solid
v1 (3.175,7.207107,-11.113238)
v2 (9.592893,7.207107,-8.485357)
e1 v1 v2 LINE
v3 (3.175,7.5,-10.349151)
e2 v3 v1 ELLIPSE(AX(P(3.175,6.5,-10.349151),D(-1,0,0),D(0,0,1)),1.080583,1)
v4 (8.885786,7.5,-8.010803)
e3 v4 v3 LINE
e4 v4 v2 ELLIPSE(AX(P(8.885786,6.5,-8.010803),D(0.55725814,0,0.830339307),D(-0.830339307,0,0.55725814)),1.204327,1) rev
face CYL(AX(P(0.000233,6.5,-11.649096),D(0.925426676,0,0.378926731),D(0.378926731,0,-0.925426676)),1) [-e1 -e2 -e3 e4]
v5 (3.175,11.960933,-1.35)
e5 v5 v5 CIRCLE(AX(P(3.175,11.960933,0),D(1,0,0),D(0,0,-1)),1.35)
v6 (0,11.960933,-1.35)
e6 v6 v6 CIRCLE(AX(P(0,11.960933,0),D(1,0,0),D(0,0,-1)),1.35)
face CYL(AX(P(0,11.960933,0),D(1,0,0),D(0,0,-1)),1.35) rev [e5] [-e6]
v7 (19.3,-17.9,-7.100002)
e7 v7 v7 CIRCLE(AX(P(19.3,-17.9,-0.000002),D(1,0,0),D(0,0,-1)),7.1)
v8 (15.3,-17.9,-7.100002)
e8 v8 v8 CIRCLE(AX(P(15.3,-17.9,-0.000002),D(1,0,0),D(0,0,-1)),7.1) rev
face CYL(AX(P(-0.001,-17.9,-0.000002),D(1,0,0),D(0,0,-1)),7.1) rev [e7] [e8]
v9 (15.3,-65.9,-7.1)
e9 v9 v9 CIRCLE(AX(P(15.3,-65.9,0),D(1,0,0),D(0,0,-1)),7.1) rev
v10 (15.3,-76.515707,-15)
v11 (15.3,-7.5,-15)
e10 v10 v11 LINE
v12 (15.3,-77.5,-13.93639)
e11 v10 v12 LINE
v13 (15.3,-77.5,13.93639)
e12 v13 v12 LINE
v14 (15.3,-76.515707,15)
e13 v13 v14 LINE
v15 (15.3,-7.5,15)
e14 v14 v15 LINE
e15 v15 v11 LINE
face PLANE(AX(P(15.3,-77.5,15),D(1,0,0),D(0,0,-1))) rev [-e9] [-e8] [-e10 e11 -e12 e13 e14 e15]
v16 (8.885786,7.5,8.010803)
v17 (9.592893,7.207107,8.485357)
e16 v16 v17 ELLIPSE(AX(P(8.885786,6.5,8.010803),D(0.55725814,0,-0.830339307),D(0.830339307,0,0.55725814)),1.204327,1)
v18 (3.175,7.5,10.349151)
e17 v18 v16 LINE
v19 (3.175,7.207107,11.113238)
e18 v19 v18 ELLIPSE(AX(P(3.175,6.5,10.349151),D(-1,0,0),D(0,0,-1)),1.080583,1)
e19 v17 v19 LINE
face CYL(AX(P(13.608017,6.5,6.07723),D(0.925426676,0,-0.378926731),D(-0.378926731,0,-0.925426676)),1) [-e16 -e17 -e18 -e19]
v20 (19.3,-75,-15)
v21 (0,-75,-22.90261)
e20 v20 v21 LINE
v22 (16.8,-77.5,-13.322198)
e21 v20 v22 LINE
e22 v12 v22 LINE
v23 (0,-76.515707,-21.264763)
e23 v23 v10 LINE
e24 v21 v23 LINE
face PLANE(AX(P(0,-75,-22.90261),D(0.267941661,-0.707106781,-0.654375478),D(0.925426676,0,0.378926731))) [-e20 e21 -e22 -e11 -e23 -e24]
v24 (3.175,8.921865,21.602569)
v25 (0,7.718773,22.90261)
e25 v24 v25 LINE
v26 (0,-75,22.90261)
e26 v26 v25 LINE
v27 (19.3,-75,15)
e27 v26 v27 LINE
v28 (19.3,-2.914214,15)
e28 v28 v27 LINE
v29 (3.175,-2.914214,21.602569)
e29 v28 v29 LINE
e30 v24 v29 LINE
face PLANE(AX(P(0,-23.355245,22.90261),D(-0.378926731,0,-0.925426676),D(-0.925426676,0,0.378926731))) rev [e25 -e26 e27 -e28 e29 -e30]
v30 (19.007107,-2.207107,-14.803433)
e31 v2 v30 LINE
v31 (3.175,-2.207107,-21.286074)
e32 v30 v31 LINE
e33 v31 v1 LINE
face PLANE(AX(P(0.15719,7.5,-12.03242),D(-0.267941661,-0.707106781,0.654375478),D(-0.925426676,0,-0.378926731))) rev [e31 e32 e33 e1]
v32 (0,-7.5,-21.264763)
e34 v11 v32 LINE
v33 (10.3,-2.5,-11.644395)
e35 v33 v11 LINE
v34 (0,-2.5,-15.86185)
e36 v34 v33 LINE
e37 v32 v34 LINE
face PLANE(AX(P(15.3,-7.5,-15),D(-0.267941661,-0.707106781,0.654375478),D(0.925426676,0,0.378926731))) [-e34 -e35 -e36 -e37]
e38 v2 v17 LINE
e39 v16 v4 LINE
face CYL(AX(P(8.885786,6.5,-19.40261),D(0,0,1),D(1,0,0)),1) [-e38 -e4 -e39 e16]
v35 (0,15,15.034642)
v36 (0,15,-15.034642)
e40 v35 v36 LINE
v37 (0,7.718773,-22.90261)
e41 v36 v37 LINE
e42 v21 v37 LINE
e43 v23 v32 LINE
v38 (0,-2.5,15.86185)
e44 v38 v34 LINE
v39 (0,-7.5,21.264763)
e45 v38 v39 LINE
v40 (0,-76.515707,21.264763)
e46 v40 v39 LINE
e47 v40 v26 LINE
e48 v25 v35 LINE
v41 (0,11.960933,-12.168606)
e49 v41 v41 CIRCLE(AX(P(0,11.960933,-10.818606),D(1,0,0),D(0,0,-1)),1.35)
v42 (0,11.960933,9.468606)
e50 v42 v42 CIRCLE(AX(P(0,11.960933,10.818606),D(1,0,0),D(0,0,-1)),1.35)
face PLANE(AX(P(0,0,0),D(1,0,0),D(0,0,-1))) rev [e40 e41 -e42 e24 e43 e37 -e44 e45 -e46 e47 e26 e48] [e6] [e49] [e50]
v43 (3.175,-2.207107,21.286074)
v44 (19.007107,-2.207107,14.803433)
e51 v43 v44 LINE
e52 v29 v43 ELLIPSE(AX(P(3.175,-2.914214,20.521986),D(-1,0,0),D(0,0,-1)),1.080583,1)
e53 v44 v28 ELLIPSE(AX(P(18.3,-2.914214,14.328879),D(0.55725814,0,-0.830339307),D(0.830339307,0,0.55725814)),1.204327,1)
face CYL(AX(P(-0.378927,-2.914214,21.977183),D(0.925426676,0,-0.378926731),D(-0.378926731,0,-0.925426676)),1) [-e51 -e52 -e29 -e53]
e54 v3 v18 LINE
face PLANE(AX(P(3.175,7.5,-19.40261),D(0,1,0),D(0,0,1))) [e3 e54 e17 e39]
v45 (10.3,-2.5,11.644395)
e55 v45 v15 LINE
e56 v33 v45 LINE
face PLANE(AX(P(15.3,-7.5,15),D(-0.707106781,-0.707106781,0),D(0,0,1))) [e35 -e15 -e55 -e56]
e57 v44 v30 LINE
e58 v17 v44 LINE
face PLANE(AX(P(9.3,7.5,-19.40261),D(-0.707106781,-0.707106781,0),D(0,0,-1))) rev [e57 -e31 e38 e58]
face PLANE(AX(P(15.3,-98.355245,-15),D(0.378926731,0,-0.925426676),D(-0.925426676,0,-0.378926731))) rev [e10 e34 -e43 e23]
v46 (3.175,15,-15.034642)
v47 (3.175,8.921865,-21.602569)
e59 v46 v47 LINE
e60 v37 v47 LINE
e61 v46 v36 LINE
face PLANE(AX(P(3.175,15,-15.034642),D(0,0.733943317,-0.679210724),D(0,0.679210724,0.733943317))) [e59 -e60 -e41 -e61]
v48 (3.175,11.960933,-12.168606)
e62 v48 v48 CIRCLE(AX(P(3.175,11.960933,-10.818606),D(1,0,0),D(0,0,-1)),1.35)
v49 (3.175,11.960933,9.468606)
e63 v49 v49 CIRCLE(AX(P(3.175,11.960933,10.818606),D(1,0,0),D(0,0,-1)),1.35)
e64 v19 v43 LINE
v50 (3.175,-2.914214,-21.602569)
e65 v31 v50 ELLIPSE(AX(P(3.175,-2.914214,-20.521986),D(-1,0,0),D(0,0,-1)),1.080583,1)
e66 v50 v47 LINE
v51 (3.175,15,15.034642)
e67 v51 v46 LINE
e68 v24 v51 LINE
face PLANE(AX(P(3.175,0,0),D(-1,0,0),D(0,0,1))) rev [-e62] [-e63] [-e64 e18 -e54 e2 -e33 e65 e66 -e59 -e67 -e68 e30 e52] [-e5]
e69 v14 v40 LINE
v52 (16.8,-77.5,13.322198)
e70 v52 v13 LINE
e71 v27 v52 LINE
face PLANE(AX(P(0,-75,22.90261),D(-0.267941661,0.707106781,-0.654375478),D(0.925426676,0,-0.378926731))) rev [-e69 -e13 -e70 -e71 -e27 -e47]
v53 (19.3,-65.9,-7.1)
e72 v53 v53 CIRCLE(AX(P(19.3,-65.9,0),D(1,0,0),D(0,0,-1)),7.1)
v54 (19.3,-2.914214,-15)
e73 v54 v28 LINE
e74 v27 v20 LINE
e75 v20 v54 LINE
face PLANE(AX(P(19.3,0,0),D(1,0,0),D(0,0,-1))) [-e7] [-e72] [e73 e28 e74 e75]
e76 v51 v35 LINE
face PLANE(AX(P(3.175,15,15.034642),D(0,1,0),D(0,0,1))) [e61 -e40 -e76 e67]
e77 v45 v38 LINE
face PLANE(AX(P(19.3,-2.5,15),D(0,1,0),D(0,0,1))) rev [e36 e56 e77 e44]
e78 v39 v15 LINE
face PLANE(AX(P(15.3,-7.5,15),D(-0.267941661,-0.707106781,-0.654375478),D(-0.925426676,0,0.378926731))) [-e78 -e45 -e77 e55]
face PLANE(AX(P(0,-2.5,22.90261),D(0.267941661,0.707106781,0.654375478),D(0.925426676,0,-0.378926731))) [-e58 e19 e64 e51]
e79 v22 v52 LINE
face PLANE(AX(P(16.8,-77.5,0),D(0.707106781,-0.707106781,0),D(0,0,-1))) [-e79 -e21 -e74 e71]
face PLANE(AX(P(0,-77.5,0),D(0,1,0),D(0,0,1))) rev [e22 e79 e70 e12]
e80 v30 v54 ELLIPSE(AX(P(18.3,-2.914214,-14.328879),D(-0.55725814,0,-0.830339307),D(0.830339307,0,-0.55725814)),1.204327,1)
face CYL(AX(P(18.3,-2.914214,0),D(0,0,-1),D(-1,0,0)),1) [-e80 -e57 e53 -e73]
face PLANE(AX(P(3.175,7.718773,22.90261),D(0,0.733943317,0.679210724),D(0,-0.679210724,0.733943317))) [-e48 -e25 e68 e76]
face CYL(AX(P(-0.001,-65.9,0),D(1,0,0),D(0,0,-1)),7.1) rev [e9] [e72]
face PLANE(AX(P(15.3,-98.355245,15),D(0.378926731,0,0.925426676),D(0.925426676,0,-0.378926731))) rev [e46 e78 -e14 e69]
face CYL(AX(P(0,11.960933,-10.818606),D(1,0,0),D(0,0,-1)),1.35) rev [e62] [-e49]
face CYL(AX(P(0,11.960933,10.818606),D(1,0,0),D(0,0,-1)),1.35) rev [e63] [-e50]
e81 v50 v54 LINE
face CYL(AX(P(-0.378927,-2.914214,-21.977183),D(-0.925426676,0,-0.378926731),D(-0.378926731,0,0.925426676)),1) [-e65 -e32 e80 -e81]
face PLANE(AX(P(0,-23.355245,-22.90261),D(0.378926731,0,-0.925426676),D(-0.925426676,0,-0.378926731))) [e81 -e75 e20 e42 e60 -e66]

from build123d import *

# Parameters (mm, degrees)
SKETCH1_W            = 30
SKETCH1_H            = 5
BOSS_EXTRUDE1_DEPTH  = 19.3
SKETCH2_W            = 40
SKETCH2_H            = 10
BOSS_EXTRUDE2_DEPTH  = 3.175
SKETCH3_W            = 4
SKETCH3_H            = 30
BOSS_EXTRUDE3_DEPTH  = 75
CUT_EXTRUDE1_REACH   = 84.48
SKETCH4_R            = 7.1
BOSS_EXTRUDE7_DEPTH  = 5
BOSS_EXTRUDE8_DEPTH  = 5
CHAMFER1_SIZE        = 5
BOSS_EXTRUDE9_DEPTH  = 75
BOSS_EXTRUDE10_DEPTH = 5
CHAMFER2_SIZE        = 5
CHAMFER3_SIZE        = 10
BOSS_EXTRUDE15_DEPTH = 3.175
CUT_EXTRUDE2_DEPTH   = 81.759021382
FILLET6_R            = 1
FILLET7_R            = 1
CHAMFER6_SIZE        = 2.5
SKETCH16_R           = 1.35
CUT_EXTRUDE3_DEPTH   = 83.406281069


with BuildPart() as part:
    # Sketch1 → Boss-Extrude1 (new body)
    with BuildSketch(Plane(origin=(0, 0, 0), x_dir=(0, 0, -1), z_dir=(1, 0, 0))):
        Rectangle(SKETCH1_W, SKETCH1_H)
    extrude(amount=BOSS_EXTRUDE1_DEPTH)

    # Sketch2 → Boss-Extrude2 (add)
    with BuildSketch(Plane.ZY):
        with Locations((0.597390222, 2.5)):
            Rectangle(SKETCH2_W, SKETCH2_H)
    extrude(amount=-BOSS_EXTRUDE2_DEPTH)

    # Sketch3 → Boss-Extrude3 (add)
    with BuildSketch(Plane.XZ.offset(2.5)):
        with Locations((17.3, 0)):
            Rectangle(SKETCH3_W, SKETCH3_H)
    extrude(amount=BOSS_EXTRUDE3_DEPTH)

    # Sketch4 → Cut-Extrude1 (cut, up to next)
    with BuildSketch(Plane(origin=(19.3, 0, 0), x_dir=(0, 0, -1), z_dir=(1, 0, 0)), mode=Mode.PRIVATE) as cut_extrude1_sk1:
        with Locations((2.035e-06, -17.9)):
            Circle(SKETCH4_R)
    cut_extrude1_tool1 = extrude(cut_extrude1_sk1.sketch, amount=-CUT_EXTRUDE1_REACH, mode=Mode.PRIVATE) & part.part
    # Sketch4 → Cut-Extrude1 (cut, up to next)
    with BuildSketch(Plane(origin=(19.3, 0, 0), x_dir=(0, 0, -1), z_dir=(1, 0, 0)), mode=Mode.PRIVATE) as cut_extrude1_sk2:
        with Locations((-1.3e-07, -65.9)):
            Circle(SKETCH4_R)
    cut_extrude1_tool2 = extrude(cut_extrude1_sk2.sketch, amount=-CUT_EXTRUDE1_REACH, mode=Mode.PRIVATE) & part.part
    add(cut_extrude1_tool1.solids().sort_by_distance((19.3, -17.9, -2e-06))[0], mode=Mode.SUBTRACT)
    add(cut_extrude1_tool2.solids().sort_by_distance((19.3, -65.9, 0))[0], mode=Mode.SUBTRACT)

    # Sketch10 → Boss-Extrude7 (add)
    with BuildSketch(Plane(origin=(0, 2.5, 0), x_dir=(1, 0, 0), z_dir=(0, 1, 0))):
        Polygon((3.175, 19.402609778), (0, 19.402609778), (0, 22.902609778), (19.3, 15), (3.175, 15), align=None)
    boss_extrude7 = extrude(amount=-BOSS_EXTRUDE7_DEPTH)

    # Sketch11 → Boss-Extrude8 (add)
    with BuildSketch(Plane(origin=(0, 2.5, 0), x_dir=(1, 0, 0), z_dir=(0, 1, 0))):
        Polygon((0, 19.402609778), (0, 22.902609778), (3.175, 21.60256905), (3.175, 19.402609778), align=None)
    boss_extrude8 = extrude(amount=BOSS_EXTRUDE8_DEPTH)

    # Mirror2: Boss-Extrude7, Boss-Extrude8 across plane
    add(boss_extrude7.mirror(Plane(origin=(0, 0, 0), x_dir=(1, 0, 0), z_dir=(0, 0, -1))))
    add(boss_extrude8.mirror(Plane(origin=(0, 0, 0), x_dir=(1, 0, 0), z_dir=(0, 0, -1))))

    # Chamfer1
    chamfer1_edges = [part.edges().sort_by_distance(p)[0] for p in [
        (3.175, 2.5, 0),
    ]]
    chamfer(chamfer1_edges, length=CHAMFER1_SIZE - 0.0001)  # a hair under: the kernel refuses the full size

    # Sketch12 → Boss-Extrude9 (add)
    with BuildSketch(Plane.XZ.offset(2.5)):
        Polygon((0, -22.902609778), (19.3, -15), (15.3, -15), (0, -21.264763192), align=None)
        Polygon((0, 22.902609778), (19.3, 15), (15.3, 15), (0, 21.264763192), align=None)
    extrude(amount=BOSS_EXTRUDE9_DEPTH)

    # Sketch13 → Boss-Extrude10 (add)
    with BuildSketch(Plane(origin=(0, 2.5, 0), x_dir=(1, 0, 0), z_dir=(0, 1, 0))):
        Polygon((3.175, 21.60256905), (3.175, -21.60256905), (19.3, -15), (19.3, 15), align=None)
    extrude(amount=BOSS_EXTRUDE10_DEPTH)

    # Chamfer2
    chamfer2_edges = [part.edges().sort_by_distance(p)[0] for p in [
        (7.65, -2.5, -18.132381596),
        (7.65, -2.5, 18.132381596),
        (15.3, -2.5, 0),
    ]]
    chamfer(chamfer2_edges, length=CHAMFER2_SIZE)

    # Chamfer3
    chamfer3_edges = [part.edges().sort_by_distance(p)[0] for p in [
        (9.65, 7.5, 18.951304889),
        (19.3, 7.5, 0),
        (9.65, 7.5, -18.951304889),
    ]]
    chamfer(chamfer3_edges, length=CHAMFER3_SIZE)

    # Sketch14 → Boss-Extrude15 (add)
    with BuildSketch(Plane.ZY):
        Polygon((-22.902609778, -2.5), (-22.902609778, 7.718772797), (-15.034642071, 15), (15.034642071, 15), (22.902609778, 7.718772797), (22.902609778, -2.5), align=None)
    extrude(amount=-BOSS_EXTRUDE15_DEPTH)

    # Sketch15 → Cut-Extrude2 (cut, through all)
    with BuildSketch(Plane.XZ.offset(2.5)):
        Polygon((3.175, 22.902609778), (0, 22.902609778), (3.175, 21.60256905), align=None)
        Polygon((3.175, -22.902609778), (3.175, -21.60256905), (0, -22.902609778), align=None)
    extrude(amount=-CUT_EXTRUDE2_DEPTH, mode=Mode.SUBTRACT)

    # Fillet6
    fillet6_edges = [part.edges().sort_by_distance(p)[0] for p in [
        (9.3, 7.5, 0),
        (6.2375, 7.5, -9.542766367),
        (6.2375, 7.5, 9.542766367),
    ]]
    fillet(fillet6_edges, radius=FILLET6_R)

    # Fillet7
    fillet7_edges = [part.edges().sort_by_distance(p)[0] for p in [
        (11.2375, -2.5, 18.301284525),
        (19.3, -2.5, 0),
        (11.2375, -2.5, -18.301284525),
    ]]
    fillet(fillet7_edges, radius=FILLET7_R)

    # Chamfer6
    chamfer6_edges = [part.edges().sort_by_distance(p)[0] for p in [
        (9.65, -77.5, -18.951304889),
        (19.3, -77.5, 0),
        (9.65, -77.5, 18.951304889),
    ]]
    chamfer(chamfer6_edges, length=CHAMFER6_SIZE)

    # Sketch16 → Cut-Extrude3 (cut, through all)
    with BuildSketch(Plane(origin=(3.175, 0, 0), x_dir=(0, 0, -1), z_dir=(1, 0, 0))):
        with Locations((0, 11.960932583)):
            Circle(SKETCH16_R)
        with Locations((-10.818605561, 11.960932583)):
            Circle(SKETCH16_R)
        with Locations((10.818605561, 11.960932583)):
            Circle(SKETCH16_R)
    extrude(amount=-CUT_EXTRUDE3_DEPTH, mode=Mode.SUBTRACT)


solid = part.part
